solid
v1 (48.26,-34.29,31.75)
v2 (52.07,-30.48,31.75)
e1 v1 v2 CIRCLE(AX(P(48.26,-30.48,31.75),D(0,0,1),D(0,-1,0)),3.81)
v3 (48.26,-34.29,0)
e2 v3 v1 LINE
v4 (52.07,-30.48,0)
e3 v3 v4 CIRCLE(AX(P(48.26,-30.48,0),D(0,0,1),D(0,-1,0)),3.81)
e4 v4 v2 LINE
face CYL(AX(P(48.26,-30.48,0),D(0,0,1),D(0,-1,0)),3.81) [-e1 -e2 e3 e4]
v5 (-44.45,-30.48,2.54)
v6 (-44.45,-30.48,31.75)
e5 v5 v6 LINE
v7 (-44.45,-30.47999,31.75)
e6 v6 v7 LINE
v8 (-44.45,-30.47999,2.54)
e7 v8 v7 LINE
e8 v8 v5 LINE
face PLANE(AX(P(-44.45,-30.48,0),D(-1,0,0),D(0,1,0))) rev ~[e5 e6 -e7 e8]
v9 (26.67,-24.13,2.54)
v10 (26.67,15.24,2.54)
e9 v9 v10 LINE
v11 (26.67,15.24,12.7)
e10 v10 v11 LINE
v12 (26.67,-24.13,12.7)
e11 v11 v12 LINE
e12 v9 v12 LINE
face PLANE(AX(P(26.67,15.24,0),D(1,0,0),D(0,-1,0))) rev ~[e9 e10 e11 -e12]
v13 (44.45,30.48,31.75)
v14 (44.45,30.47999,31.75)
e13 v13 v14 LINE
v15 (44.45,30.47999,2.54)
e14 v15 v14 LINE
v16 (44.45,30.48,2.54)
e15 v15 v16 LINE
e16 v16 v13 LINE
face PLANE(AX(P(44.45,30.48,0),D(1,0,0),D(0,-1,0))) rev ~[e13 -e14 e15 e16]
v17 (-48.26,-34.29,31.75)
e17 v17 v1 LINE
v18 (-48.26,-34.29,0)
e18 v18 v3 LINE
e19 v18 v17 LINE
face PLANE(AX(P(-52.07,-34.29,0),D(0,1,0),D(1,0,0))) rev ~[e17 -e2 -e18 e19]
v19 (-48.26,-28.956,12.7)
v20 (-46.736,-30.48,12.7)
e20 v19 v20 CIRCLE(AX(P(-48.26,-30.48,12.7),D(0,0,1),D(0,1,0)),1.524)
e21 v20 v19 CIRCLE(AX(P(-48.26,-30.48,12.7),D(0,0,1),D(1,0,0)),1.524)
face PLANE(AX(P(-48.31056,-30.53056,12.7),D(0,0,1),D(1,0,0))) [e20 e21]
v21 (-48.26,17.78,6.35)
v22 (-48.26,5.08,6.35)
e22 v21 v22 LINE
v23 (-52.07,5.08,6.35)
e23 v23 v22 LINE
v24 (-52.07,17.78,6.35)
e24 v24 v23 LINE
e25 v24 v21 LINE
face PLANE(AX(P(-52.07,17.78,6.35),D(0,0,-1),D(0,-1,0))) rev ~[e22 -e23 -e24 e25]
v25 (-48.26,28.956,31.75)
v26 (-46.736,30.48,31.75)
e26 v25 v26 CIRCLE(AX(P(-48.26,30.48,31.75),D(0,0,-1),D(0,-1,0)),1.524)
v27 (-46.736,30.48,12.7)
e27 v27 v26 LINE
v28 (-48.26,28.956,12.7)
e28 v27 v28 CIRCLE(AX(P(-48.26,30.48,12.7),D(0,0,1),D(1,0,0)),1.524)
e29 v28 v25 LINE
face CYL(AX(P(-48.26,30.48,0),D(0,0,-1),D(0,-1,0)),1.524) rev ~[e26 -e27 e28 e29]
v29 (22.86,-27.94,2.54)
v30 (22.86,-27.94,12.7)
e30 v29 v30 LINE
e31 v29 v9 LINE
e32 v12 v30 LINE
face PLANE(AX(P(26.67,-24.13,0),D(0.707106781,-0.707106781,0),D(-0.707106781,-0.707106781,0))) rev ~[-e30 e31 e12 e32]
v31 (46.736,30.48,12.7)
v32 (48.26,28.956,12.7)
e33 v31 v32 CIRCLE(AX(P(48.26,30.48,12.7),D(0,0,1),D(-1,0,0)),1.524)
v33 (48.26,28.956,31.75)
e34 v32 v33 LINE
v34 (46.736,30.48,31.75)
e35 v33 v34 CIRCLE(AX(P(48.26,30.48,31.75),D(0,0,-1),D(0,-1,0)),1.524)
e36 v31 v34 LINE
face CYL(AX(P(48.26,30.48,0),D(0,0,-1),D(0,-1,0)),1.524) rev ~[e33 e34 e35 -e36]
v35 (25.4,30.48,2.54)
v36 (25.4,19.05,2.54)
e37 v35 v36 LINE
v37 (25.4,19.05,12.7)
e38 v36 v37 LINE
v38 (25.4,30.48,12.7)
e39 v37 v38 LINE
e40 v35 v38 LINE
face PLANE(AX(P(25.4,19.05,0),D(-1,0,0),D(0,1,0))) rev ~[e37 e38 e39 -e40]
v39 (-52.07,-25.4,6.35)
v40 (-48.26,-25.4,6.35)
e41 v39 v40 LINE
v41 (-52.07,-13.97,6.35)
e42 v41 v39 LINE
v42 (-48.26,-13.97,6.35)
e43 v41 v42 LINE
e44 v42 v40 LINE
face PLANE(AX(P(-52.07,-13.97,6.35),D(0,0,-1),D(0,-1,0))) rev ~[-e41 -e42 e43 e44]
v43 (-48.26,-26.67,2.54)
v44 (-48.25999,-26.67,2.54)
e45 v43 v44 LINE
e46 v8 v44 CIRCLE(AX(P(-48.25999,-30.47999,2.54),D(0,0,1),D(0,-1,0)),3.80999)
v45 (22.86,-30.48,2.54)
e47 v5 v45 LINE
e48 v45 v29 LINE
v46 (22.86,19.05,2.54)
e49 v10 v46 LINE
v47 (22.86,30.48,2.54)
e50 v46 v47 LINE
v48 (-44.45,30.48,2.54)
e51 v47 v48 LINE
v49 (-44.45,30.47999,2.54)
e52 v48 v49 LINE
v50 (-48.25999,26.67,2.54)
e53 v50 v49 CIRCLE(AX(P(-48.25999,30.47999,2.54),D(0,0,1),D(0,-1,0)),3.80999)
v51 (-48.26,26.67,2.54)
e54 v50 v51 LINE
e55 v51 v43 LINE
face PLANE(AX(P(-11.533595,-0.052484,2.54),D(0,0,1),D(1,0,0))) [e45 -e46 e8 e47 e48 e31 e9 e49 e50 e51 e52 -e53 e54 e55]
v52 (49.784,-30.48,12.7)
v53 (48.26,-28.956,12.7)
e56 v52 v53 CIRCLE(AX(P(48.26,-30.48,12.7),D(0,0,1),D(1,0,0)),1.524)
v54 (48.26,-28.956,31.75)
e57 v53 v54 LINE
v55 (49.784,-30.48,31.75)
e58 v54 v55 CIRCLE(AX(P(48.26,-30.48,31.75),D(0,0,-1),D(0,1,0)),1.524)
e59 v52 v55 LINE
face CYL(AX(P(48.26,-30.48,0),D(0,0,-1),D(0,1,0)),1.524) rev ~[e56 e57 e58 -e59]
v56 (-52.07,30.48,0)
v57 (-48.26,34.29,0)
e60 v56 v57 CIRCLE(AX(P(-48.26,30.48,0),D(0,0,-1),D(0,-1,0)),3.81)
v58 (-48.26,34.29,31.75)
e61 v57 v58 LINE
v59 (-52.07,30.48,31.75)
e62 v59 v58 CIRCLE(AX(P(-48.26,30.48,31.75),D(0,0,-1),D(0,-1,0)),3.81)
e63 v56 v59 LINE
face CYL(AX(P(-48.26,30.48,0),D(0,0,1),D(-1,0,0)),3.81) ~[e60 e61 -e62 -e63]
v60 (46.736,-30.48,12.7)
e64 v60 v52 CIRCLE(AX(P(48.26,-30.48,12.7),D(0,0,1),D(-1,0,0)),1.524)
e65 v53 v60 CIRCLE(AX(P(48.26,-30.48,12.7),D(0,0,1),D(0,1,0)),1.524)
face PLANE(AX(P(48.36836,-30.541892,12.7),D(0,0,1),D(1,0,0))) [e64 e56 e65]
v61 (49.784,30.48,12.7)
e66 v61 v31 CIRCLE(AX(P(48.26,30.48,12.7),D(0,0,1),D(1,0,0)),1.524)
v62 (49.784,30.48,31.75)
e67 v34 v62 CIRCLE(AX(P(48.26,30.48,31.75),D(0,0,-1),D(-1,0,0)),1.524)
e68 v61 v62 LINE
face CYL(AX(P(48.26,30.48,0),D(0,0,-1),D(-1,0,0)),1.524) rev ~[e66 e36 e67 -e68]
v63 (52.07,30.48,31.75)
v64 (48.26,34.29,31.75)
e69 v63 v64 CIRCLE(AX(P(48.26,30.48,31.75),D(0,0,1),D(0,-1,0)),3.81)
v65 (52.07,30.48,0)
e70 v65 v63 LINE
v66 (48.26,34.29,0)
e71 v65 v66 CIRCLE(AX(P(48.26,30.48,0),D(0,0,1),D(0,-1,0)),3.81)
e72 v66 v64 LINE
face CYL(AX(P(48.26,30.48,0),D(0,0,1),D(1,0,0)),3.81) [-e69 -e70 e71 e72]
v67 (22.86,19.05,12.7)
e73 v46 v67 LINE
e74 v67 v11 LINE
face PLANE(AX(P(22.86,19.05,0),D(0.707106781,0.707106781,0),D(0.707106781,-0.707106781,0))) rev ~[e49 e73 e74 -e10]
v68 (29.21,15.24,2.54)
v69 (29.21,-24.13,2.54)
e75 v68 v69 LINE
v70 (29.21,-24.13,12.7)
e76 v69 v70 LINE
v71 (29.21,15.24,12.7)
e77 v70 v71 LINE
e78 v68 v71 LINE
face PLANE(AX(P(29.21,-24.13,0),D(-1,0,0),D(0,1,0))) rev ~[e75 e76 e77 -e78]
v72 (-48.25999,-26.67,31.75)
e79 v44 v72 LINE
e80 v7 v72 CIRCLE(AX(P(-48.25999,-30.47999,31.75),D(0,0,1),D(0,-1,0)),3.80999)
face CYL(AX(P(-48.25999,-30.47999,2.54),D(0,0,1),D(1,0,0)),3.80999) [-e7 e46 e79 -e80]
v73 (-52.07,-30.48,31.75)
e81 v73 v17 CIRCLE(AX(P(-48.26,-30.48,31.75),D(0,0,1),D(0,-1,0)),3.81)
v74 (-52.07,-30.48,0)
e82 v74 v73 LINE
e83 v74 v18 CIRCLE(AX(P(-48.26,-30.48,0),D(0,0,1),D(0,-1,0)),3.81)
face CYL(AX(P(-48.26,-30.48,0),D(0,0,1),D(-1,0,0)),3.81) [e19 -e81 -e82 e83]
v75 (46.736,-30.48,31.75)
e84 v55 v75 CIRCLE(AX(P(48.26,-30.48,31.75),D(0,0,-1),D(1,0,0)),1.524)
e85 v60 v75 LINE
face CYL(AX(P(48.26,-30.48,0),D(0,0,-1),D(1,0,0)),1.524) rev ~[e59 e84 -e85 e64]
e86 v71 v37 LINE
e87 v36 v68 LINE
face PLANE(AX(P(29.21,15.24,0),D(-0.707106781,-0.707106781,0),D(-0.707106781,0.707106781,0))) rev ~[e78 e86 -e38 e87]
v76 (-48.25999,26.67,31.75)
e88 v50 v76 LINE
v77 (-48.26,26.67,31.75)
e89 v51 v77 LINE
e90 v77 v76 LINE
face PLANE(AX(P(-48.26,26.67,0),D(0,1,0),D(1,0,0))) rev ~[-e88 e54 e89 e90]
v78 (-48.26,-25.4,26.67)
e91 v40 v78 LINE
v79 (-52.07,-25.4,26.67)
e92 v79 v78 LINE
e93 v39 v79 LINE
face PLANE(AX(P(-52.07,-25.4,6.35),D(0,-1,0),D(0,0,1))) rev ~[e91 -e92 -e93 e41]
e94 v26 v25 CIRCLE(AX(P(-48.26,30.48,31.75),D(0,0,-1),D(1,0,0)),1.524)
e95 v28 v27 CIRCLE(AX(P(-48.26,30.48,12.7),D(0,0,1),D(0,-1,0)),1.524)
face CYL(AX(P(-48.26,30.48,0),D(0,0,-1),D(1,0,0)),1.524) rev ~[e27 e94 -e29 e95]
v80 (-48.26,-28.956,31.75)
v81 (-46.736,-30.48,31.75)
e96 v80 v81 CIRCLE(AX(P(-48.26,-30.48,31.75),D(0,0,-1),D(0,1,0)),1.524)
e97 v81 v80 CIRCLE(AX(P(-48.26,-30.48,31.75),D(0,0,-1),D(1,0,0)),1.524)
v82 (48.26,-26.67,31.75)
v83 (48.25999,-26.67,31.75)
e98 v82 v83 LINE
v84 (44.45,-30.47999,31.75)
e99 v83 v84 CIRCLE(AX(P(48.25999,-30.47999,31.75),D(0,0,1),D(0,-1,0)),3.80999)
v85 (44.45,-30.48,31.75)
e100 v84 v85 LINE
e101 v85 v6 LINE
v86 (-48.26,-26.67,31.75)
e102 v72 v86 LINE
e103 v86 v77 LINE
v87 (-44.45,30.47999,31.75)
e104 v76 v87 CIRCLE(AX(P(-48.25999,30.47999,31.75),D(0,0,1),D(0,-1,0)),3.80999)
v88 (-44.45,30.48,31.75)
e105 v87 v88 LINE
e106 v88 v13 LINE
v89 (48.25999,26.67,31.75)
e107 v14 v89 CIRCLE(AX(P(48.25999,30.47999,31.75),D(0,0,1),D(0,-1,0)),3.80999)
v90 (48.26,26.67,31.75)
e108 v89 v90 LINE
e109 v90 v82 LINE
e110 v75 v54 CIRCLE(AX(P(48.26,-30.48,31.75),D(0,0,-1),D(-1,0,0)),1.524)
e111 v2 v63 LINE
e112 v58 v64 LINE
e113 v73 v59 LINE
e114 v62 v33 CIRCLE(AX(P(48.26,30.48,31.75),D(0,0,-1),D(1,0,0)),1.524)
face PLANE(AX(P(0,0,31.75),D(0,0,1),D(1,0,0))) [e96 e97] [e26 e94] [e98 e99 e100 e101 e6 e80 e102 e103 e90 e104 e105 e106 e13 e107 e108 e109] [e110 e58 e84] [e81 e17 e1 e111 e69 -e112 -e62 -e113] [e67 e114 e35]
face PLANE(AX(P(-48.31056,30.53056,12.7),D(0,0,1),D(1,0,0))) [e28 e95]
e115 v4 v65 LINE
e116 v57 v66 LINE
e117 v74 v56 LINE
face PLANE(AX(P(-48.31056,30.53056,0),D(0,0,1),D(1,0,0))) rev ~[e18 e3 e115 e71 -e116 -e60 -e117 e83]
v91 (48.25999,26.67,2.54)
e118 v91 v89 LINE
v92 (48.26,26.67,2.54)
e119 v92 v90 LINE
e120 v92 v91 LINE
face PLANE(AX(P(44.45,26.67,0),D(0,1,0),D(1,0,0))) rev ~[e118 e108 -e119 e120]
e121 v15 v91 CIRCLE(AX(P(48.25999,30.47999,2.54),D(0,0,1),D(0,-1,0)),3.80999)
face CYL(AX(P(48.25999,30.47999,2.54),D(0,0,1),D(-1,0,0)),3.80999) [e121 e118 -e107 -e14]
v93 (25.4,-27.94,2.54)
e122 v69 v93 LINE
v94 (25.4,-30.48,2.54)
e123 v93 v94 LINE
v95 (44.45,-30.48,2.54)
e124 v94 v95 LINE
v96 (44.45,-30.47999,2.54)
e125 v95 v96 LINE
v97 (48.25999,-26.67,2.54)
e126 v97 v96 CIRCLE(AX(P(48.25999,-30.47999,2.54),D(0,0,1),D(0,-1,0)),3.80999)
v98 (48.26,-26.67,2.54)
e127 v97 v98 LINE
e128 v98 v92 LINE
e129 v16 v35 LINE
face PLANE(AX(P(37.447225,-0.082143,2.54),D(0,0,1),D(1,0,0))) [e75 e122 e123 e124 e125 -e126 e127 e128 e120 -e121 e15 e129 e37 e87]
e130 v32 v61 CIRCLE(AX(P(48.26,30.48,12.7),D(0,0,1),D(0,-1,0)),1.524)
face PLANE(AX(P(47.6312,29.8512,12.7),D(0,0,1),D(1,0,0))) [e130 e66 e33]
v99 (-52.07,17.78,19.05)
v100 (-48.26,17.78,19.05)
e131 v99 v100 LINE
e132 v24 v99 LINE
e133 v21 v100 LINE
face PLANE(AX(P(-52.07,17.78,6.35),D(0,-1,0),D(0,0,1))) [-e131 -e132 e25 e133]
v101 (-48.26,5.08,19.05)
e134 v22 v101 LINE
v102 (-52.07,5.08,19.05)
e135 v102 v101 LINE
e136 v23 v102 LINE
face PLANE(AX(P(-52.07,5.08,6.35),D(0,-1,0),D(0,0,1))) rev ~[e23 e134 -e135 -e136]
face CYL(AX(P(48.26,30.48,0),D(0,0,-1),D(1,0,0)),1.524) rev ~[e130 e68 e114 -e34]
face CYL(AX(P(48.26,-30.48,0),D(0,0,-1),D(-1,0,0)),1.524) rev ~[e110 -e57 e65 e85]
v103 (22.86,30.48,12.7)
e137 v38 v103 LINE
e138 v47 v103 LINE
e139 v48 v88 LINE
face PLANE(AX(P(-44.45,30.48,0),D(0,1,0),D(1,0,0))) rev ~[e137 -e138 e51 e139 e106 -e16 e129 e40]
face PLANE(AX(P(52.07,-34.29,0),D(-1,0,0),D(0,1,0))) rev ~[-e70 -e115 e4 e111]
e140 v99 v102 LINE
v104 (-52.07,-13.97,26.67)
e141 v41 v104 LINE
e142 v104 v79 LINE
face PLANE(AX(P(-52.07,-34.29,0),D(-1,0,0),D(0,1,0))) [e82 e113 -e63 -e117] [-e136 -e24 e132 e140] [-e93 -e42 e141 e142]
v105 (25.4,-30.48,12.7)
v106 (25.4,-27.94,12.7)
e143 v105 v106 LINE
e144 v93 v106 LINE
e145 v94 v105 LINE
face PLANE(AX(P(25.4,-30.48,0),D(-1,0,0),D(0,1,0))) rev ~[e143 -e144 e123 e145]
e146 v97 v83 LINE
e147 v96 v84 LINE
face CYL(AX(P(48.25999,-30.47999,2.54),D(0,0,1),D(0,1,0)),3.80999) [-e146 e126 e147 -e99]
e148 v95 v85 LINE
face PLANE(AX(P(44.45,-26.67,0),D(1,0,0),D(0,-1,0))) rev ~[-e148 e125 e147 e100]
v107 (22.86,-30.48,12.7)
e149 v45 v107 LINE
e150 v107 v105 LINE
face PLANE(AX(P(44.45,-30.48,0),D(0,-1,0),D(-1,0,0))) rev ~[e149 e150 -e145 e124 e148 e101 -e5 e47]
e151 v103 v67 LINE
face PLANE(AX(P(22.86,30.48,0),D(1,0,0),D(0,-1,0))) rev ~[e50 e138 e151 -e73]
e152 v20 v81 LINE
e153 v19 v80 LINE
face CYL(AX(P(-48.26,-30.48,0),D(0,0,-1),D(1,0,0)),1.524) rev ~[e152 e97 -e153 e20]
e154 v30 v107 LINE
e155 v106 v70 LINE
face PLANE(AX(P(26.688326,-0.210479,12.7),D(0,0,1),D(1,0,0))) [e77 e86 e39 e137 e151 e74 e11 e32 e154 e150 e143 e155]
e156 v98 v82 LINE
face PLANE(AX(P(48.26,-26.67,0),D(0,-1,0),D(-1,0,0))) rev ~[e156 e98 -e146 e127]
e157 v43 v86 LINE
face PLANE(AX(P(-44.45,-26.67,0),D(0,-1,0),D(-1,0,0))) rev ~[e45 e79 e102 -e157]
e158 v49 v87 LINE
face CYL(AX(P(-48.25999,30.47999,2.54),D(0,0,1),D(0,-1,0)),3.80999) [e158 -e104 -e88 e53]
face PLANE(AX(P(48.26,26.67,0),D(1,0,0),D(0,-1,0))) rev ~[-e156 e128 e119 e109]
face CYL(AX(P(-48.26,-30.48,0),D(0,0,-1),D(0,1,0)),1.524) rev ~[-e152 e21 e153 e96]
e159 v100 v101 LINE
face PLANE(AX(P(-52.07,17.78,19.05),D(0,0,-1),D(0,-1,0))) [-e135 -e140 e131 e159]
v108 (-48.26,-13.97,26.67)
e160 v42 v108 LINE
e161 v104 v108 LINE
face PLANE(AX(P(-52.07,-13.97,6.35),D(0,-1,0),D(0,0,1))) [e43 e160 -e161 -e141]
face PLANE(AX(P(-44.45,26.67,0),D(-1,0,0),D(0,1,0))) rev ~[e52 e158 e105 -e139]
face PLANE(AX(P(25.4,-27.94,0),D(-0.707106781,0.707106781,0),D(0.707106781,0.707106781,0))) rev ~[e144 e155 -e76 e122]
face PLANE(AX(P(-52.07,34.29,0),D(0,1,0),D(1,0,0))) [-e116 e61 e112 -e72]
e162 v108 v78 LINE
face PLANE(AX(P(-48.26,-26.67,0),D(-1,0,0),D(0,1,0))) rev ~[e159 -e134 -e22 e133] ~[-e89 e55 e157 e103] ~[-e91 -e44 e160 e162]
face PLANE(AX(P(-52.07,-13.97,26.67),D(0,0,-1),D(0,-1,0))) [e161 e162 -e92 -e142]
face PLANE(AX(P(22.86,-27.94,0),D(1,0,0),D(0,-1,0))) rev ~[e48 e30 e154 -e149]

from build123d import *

# Parameters (mm, degrees)
F0_W     = 104.14
F0_H     = 68.58
F1_DEPTH = 31.75
F2_DEPTH = 12.7
F3_DEPTH = 2.54
F4_W     = 12.7
F4_H     = 12.7
F4_W_2   = 11.43
F4_H_2   = 20.32
F5_DEPTH = 10.16
F6_R     = 3.81
F7_R     = 3.80999
F8_DEPTH = 12.7


# Not quite as in the source:
# - a fillet or chamfer is up to 0.001 mm smaller than in the source, because OpenCascade refuses the exact size


with BuildPart() as f1:
    # F0 (on Top) → F1 (new body)
    with BuildSketch(Plane.XY):
        Rectangle(F0_W, F0_H)
        with BuildLine():
            ThreePointArc((-48.26, 28.956), (-49.3376307345, 31.5576307345), (-46.736, 30.48))
            Line((-46.736, 30.48), (-44.45, 30.48))
            Line((-44.45, 30.48), (22.86, 30.48))
            Line((22.86, 30.48), (25.4, 30.48))
            Line((25.4, 30.48), (44.45, 30.48))
            Line((44.45, 30.48), (46.736, 30.48))
            ThreePointArc((46.736, 30.48), (48.26, 32.004), (49.784, 30.48))
            ThreePointArc((49.784, 30.48), (49.3376307345, 29.4023692655), (48.26, 28.956))
            Line((48.26, 28.956), (48.26, 26.67))
            Line((48.26, 26.67), (48.26, -26.67))
            Line((48.26, -26.67), (48.26, -28.956))
            ThreePointArc((48.26, -28.956), (49.3376307345, -29.4023692655), (49.784, -30.48))
            ThreePointArc((49.784, -30.48), (48.26, -32.004), (46.736, -30.48))
            Line((46.736, -30.48), (44.45, -30.48))
            Line((44.45, -30.48), (25.4, -30.48))
            Line((25.4, -30.48), (22.86, -30.48))
            Line((22.86, -30.48), (-44.45, -30.48))
            Line((-44.45, -30.48), (-46.736, -30.48))
            ThreePointArc((-46.736, -30.48), (-49.3376307345, -31.5576307345), (-48.26, -28.956))
            Line((-48.26, -28.956), (-48.26, -26.67))
            Line((-48.26, -26.67), (-48.26, 26.67))
            Line((-48.26, 26.67), (-48.26, 28.956))
        make_face(mode=Mode.SUBTRACT)
        with BuildLine():
            Line((46.736, 30.48), (44.45, 30.48))
            Line((44.45, 30.48), (44.45, 26.67))
            Line((44.45, 26.67), (48.26, 26.67))
            Line((48.26, 26.67), (48.26, 28.956))
            ThreePointArc((48.26, 28.956), (47.1823692655, 29.4023692655), (46.736, 30.48))
        make_face()
        with BuildLine():
            Line((48.26, -28.956), (48.26, -26.67))
            Line((48.26, -26.67), (44.45, -26.67))
            Line((44.45, -26.67), (44.45, -30.48))
            Line((44.45, -30.48), (46.736, -30.48))
            ThreePointArc((46.736, -30.48), (47.1823692655, -29.4023692655), (48.26, -28.956))
        make_face()
        with BuildLine():
            Line((-44.45, -26.67), (-48.26, -26.67))
            Line((-48.26, -26.67), (-48.26, -28.956))
            ThreePointArc((-48.26, -28.956), (-47.1823692655, -29.4023692655), (-46.736, -30.48))
            Line((-46.736, -30.48), (-44.45, -30.48))
            Line((-44.45, -30.48), (-44.45, -26.67))
        make_face()
        with BuildLine():
            Line((-44.45, 30.48), (-46.736, 30.48))
            ThreePointArc((-46.736, 30.48), (-47.1823692655, 29.4023692655), (-48.26, 28.956))
            Line((-48.26, 28.956), (-48.26, 26.67))
            Line((-48.26, 26.67), (-44.45, 26.67))
            Line((-44.45, 26.67), (-44.45, 30.48))
        make_face()
    extrude(amount=F1_DEPTH)

    # F0 (on Top) → F2 (join)
    with BuildSketch(Plane.XY):
        Polygon((25.4, 30.48), (22.86, 30.48), (22.86, 19.05), (26.67, 15.24), (26.67, -24.13), (22.86, -27.94), (22.86, -30.48), (25.4, -30.48), (25.4, -27.94), (29.21, -24.13), (29.21, 15.24), (25.4, 19.05), align=None)
    extrude(amount=F2_DEPTH)

    # F0 (on Top) → F3 (join)
    with BuildSketch(Plane.XY):
        Polygon((22.86, 30.48), (-44.45, 30.48), (-44.45, 26.67), (-48.26, 26.67), (-48.26, -26.67), (-44.45, -26.67), (-44.45, -30.48), (22.86, -30.48), (22.86, -27.94), (26.67, -24.13), (26.67, 15.24), (22.86, 19.05), align=None)
        Polygon((44.45, 30.48), (25.4, 30.48), (25.4, 19.05), (29.21, 15.24), (29.21, -24.13), (25.4, -27.94), (25.4, -30.48), (44.45, -30.48), (44.45, -26.67), (48.26, -26.67), (48.26, 26.67), (44.45, 26.67), align=None)
    extrude(amount=F3_DEPTH)

    # F4 (on face) → F5 (cut)
    with BuildSketch(Plane(origin=(-52.07, 0, 0), x_dir=(0, -1, 0), z_dir=(-1, 0, 0))):
        with Locations((-11.43, 12.7)):
            Rectangle(F4_W, F4_H)
        with Locations((19.685, 16.51)):
            Rectangle(F4_W_2, F4_H_2)
    extrude(amount=-F5_DEPTH, mode=Mode.SUBTRACT)

    # F6
    f6_edges = [f1.edges().sort_by_distance(p)[0] for p in [
        (-52.07, -34.29, 15.875),
        (52.07, -34.29, 15.875),
        (52.07, 34.29, 15.875),
        (-52.07, 34.29, 15.875),
    ]]
    fillet(f6_edges, radius=F6_R)

    # F7 (radius 3.81 in the source; OpenCascade refuses exactly that, so slightly less here)
    f7_edges = [f1.edges().sort_by_distance(p)[0] for p in [
        (44.45, 26.67, 17.145),
        (-44.45, 26.67, 17.145),
        (44.45, -26.67, 17.145),
        (-44.45, -26.67, 17.145),
    ]]
    fillet(f7_edges, radius=F7_R)

    # F0 (on Top) → F8 (join)
    with BuildSketch(Plane.XY):
        with BuildLine():
            Line((-48.26, 28.956), (-48.26, 30.48))
            Line((-48.26, 30.48), (-46.736, 30.48))
            ThreePointArc((-46.736, 30.48), (-49.3376307345, 31.5576307345), (-48.26, 28.956))
        make_face()
        with BuildLine():
            Line((48.26, 30.48), (46.736, 30.48))
            ThreePointArc((46.736, 30.48), (47.1823692655, 29.4023692655), (48.26, 28.956))
            Line((48.26, 28.956), (48.26, 30.48))
        make_face()
        with BuildLine():
            ThreePointArc((49.784, 30.48), (48.26, 32.004), (46.736, 30.48))
            Line((46.736, 30.48), (48.26, 30.48))
            Line((48.26, 30.48), (48.26, 28.956))
            ThreePointArc((48.26, 28.956), (49.3376307345, 29.4023692655), (49.784, 30.48))
        make_face()
        with BuildLine():
            Line((-46.736, 30.48), (-48.26, 30.48))
            Line((-48.26, 30.48), (-48.26, 28.956))
            ThreePointArc((-48.26, 28.956), (-47.1823692655, 29.4023692655), (-46.736, 30.48))
        make_face()
        with BuildLine():
            Line((-48.26, -30.48), (-48.26, -28.956))
            ThreePointArc((-48.26, -28.956), (-49.3376307345, -31.5576307345), (-46.736, -30.48))
            Line((-46.736, -30.48), (-48.26, -30.48))
        make_face()
        with BuildLine():
            ThreePointArc((-46.736, -30.48), (-47.1823692655, -29.4023692655), (-48.26, -28.956))
            Line((-48.26, -28.956), (-48.26, -30.48))
            Line((-48.26, -30.48), (-46.736, -30.48))
        make_face()
        with BuildLine():
            ThreePointArc((49.784, -30.48), (49.3376307345, -29.4023692655), (48.26, -28.956))
            Line((48.26, -28.956), (48.26, -30.48))
            Line((48.26, -30.48), (46.736, -30.48))
            ThreePointArc((46.736, -30.48), (48.26, -32.004), (49.784, -30.48))
        make_face()
        with BuildLine():
            Line((48.26, -30.48), (48.26, -28.956))
            ThreePointArc((48.26, -28.956), (47.1823692655, -29.4023692655), (46.736, -30.48))
            Line((46.736, -30.48), (48.26, -30.48))
        make_face()
    extrude(amount=F8_DEPTH)


solid = f1.part
